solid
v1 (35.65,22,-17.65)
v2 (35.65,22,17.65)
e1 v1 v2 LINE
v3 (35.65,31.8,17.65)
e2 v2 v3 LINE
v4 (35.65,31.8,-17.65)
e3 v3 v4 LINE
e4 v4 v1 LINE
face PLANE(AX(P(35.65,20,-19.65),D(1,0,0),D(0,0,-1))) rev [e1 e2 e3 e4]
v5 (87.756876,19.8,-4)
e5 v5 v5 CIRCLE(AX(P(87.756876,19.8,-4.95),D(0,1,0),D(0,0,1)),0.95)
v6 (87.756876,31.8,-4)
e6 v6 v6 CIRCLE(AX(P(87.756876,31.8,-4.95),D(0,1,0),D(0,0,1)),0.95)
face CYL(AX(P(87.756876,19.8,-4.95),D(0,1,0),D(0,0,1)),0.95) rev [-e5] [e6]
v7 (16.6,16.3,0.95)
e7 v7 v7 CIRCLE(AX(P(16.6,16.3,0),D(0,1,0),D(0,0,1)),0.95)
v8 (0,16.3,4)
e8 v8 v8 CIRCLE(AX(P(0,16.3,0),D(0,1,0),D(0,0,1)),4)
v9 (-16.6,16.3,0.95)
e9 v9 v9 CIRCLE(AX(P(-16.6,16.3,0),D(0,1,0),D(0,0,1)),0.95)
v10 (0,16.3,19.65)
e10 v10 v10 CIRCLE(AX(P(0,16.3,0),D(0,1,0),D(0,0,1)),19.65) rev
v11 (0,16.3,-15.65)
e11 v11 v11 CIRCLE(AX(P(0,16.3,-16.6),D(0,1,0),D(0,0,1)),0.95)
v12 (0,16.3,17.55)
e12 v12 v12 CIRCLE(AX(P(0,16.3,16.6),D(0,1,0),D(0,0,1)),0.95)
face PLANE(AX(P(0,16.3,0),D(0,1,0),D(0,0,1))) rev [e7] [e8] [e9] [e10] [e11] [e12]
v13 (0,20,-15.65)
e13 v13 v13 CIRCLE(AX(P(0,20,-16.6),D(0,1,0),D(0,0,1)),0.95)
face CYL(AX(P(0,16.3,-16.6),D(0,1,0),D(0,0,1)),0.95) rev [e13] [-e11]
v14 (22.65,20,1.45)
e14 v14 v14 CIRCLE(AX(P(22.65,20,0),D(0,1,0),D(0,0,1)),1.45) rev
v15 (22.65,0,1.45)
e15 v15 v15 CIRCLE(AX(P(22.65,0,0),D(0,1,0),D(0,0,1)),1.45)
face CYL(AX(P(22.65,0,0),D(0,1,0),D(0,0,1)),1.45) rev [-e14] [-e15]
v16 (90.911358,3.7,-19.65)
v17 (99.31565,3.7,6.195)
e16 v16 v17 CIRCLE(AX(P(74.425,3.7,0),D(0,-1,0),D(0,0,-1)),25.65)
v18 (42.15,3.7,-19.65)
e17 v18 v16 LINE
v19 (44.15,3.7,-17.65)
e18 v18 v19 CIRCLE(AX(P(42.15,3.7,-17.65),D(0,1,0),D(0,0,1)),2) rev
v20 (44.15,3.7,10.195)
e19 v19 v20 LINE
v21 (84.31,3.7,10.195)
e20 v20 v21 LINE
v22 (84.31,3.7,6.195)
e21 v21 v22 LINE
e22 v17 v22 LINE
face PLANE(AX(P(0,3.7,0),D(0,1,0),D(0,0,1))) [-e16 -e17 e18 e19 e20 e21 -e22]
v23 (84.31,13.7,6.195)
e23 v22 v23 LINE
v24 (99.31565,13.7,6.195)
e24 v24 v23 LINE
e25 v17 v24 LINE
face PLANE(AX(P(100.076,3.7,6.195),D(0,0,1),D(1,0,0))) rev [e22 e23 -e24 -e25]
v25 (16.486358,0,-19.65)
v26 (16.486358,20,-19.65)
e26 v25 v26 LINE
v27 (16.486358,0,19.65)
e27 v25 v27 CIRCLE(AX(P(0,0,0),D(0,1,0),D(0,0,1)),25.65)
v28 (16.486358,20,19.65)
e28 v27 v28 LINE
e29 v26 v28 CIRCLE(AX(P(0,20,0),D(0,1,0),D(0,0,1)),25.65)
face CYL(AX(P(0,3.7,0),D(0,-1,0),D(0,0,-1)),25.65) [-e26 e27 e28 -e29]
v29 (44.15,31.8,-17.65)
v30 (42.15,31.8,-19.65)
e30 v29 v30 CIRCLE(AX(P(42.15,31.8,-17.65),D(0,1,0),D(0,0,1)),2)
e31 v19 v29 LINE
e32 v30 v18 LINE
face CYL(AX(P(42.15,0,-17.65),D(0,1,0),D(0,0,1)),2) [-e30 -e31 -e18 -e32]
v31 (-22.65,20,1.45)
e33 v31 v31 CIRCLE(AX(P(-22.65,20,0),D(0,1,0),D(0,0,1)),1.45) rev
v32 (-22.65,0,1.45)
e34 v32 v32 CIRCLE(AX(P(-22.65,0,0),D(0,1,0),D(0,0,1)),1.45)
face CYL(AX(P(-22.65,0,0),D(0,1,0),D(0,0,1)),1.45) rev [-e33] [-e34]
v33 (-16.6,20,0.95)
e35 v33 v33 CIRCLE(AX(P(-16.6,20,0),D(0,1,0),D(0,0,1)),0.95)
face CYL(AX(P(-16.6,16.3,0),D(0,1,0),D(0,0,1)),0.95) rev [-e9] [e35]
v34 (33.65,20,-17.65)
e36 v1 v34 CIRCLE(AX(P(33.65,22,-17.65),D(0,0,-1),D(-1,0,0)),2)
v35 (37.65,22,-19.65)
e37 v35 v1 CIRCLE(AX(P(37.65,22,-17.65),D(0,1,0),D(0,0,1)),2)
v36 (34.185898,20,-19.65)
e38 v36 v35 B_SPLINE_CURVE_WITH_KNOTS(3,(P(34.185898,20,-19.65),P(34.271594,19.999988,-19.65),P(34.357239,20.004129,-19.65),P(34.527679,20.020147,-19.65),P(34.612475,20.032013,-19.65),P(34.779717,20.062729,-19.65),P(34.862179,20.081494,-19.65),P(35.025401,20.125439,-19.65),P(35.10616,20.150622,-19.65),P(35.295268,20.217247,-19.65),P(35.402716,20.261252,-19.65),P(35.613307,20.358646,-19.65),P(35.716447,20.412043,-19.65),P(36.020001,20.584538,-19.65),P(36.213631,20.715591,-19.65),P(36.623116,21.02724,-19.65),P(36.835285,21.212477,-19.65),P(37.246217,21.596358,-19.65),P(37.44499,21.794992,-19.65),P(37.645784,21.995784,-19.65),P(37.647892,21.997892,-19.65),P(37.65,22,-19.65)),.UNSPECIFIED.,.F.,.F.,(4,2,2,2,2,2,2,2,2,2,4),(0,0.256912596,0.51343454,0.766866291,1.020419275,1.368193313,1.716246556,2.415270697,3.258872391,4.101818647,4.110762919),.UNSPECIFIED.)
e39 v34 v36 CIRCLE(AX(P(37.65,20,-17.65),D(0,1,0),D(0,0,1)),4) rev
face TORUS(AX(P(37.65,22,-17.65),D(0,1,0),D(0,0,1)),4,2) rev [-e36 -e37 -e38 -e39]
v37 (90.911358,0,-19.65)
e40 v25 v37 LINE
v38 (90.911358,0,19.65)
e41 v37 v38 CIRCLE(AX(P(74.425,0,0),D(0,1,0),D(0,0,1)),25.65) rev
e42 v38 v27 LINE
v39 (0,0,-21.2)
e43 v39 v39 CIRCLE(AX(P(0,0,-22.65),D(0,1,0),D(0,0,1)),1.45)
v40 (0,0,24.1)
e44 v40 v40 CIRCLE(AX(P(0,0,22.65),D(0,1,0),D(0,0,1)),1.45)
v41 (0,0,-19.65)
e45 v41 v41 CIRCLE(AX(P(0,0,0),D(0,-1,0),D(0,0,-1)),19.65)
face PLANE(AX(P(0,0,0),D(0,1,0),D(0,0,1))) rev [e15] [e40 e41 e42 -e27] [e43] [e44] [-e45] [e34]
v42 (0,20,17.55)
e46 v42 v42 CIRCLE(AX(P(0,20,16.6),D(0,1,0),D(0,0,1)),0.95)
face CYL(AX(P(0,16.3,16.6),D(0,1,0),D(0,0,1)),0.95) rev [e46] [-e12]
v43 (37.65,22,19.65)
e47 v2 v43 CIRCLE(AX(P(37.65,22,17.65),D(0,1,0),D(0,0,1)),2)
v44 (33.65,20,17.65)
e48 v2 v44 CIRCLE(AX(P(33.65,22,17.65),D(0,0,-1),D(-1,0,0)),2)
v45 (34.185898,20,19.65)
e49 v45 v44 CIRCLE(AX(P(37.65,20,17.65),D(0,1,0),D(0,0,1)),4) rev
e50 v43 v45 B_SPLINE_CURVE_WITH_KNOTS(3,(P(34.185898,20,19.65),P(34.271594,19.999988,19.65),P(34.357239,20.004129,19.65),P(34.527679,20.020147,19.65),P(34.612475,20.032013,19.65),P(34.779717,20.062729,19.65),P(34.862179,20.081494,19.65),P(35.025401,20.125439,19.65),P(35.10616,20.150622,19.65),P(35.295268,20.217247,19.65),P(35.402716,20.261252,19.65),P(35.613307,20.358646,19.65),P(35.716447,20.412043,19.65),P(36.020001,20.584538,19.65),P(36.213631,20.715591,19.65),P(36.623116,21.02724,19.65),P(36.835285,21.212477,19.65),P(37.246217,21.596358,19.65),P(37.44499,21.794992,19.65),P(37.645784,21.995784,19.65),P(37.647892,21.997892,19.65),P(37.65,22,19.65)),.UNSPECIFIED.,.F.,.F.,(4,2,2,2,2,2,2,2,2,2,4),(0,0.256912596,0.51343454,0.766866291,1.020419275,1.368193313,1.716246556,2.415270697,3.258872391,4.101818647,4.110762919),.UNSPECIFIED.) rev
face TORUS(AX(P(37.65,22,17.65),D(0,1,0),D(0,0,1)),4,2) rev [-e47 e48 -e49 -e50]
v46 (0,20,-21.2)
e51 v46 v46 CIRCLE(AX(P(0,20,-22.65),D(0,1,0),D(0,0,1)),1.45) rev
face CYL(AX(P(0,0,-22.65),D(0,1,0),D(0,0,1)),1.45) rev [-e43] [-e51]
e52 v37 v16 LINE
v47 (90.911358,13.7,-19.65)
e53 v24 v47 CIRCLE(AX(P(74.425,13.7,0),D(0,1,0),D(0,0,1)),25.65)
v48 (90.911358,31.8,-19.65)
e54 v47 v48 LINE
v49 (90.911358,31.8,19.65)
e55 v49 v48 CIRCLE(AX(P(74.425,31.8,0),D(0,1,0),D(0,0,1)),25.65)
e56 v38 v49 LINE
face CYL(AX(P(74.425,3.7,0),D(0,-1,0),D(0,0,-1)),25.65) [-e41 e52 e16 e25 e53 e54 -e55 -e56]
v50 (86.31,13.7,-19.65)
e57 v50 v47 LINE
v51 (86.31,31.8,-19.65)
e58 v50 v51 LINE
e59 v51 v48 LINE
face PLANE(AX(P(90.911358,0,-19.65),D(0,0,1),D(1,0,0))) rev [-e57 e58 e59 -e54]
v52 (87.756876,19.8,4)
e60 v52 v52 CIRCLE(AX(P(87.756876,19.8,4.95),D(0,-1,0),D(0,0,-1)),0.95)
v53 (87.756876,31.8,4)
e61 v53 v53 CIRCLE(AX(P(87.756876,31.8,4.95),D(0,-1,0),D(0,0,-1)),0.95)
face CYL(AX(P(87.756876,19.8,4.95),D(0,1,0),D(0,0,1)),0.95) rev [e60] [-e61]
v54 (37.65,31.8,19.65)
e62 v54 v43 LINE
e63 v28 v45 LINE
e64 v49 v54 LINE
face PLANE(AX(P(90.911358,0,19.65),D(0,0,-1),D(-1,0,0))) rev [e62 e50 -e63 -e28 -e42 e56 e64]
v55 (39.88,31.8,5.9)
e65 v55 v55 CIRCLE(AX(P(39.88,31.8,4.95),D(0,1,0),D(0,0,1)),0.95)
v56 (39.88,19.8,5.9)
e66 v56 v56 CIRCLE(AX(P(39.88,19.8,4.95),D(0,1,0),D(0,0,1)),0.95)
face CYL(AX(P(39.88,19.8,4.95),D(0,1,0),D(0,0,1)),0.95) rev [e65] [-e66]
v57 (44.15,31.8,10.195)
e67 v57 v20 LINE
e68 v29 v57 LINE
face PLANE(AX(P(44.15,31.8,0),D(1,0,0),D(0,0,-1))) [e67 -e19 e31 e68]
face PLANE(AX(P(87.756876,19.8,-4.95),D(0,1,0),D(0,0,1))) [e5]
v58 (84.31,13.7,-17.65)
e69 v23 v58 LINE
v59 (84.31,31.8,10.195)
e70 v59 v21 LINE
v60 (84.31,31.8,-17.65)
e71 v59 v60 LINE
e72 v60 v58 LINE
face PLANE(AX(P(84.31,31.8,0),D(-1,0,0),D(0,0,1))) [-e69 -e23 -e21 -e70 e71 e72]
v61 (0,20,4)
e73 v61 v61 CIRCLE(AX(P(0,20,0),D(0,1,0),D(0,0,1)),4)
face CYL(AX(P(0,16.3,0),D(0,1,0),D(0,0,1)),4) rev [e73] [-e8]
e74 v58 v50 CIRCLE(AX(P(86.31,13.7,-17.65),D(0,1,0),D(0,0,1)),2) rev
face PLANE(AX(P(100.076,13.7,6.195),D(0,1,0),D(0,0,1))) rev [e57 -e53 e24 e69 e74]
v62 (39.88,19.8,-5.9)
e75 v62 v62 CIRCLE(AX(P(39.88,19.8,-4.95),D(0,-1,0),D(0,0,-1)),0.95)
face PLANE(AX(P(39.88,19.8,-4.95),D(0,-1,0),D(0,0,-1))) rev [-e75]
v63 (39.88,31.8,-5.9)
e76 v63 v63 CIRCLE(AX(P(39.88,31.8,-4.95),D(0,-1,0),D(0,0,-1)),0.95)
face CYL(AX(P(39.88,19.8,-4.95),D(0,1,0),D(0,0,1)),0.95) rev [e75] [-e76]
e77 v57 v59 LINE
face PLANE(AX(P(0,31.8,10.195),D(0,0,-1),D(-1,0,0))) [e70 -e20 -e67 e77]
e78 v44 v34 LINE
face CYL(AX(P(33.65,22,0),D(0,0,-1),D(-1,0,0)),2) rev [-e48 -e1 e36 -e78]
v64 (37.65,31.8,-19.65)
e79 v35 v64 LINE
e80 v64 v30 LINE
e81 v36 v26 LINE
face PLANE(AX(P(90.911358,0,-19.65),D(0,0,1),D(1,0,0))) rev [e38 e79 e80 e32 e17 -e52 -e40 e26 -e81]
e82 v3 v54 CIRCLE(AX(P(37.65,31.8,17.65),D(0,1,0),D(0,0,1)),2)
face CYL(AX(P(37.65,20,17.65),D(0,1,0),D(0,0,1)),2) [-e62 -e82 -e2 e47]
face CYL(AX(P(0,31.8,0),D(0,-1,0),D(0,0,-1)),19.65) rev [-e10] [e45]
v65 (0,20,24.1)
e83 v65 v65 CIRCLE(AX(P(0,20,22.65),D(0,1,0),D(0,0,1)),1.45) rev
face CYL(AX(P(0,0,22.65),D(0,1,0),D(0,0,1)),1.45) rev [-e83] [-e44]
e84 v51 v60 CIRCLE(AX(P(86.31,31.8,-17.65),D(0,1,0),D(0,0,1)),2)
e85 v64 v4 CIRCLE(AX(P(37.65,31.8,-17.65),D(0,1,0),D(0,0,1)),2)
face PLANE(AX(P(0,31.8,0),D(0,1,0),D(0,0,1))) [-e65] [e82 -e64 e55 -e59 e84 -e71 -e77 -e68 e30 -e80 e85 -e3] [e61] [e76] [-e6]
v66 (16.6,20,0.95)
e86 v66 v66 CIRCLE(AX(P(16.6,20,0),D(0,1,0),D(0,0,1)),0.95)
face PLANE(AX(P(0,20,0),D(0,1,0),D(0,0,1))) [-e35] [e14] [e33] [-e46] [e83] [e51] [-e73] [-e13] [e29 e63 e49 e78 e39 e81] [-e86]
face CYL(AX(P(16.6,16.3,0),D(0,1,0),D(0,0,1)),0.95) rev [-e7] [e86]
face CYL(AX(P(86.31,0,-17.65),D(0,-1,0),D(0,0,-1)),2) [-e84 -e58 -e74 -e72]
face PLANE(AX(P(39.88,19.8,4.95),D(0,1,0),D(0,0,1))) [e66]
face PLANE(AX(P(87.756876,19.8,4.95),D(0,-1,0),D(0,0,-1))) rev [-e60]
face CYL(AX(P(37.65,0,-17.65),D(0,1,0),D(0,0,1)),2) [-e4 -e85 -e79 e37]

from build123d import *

# Parameters (mm, degrees)
SKETCH1_R                = 25.65
SKETCH1_R_2              = 19.65
SKETCH1_R_3              = 4
SKETCH1_R_4              = 0.95
SKETCH1_W                = 40.16
SKETCH1_H                = 20.39
BOSS_EXTRUDE2_DEPTH      = 3.7
SKETCH5_R                = 19.65
SKETCH5_W                = 40.16
SKETCH5_H                = 20.39
BOSS_EXTRUDE3_DEPTH      = 28.1
CUT_EXTRUDE1_REACH       = 112.955
SKETCH6_W                = 40.16
SKETCH6_H                = 28.1
CUT_EXTRUDE2_REACH       = 119.305
CUT_EXTRUDE2_END_RADIUS  = 25.65
SKETCH7_W                = 29.863740461
SKETCH7_H                = 10
CUT_EXTRUDE3_DEPTH       = 109.093330622
CUT_EXTRUDE3_DEPTH_BACK  = 109.093330622
SKETCH8_R                = 1.45
SKETCH9_R                = 0.95
CUT_EXTRUDE4_DEPTH       = 12
CUT_EXTRUDE5_DEPTH       = 109.093330622
FILLET1_R                = 2
CUT_EXTRUDE6_DEPTH       = 11.8
BOSS_EXTRUDE4_START      = -3.7
SKETCH14_R               = 19.65
SKETCH14_R_2             = 0.95
SKETCH14_R_3             = 4
BOSS_EXTRUDE4_DEPTH      = 3.7
CUT_EXTRUDE7_START       = -3.7
CUT_EXTRUDE7_OUTLINE_R   = 19.65
CUT_EXTRUDE7_OUTLINE_R_2 = 0.95
CUT_EXTRUDE7_OUTLINE_R_3 = 4
CUT_EXTRUDE7_DEPTH       = 3.7
FILLET2_R                = 2
FILLET3_R                = 2


# Read off the part's stored shape, not the designer's step: Cut-Extrude7
with BuildPart() as part:
    # Sketch1 → Boss-Extrude2 (new body)
    # profile 1 of 6: a face of its own
    with BuildSketch(Plane(origin=(0, 0, 0), x_dir=(1, 0, 0), z_dir=(0, 1, 0))):
        Circle(SKETCH1_R)
        Circle(SKETCH1_R_2, mode=Mode.SUBTRACT)
    # profile 2 of 6: a face of its own
    with BuildSketch(Plane(origin=(0, 0, 0), x_dir=(1, 0, 0), z_dir=(0, 1, 0))):
        Circle(SKETCH1_R_2)
        with Locations(Location((0, 0, 0), (0, 0, 270))):
            Circle(SKETCH1_R_3, mode=Mode.SUBTRACT)
        with Locations(Location((16.6, 0, 0), (0, 0, 270))):
            Circle(SKETCH1_R_4, mode=Mode.SUBTRACT)
        with Locations(Location((0, -16.6, 0), (0, 0, 270))):
            Circle(SKETCH1_R_4, mode=Mode.SUBTRACT)
        with Locations(Location((-16.6, 0, 0), (0, 0, 270))):
            Circle(SKETCH1_R_4, mode=Mode.SUBTRACT)
        with Locations(Location((0, 16.6, 0), (0, 0, 270))):
            Circle(SKETCH1_R_4, mode=Mode.SUBTRACT)
    # profile 3 of 6: a face of its own
    with BuildSketch(Plane(origin=(0, 0, 0), x_dir=(1, 0, 0), z_dir=(0, 1, 0))):
        with BuildLine():
            Line((35.65, 18.695), (91.986875612, 18.695))
            ThreePointArc((91.986875612, 18.695), (83.869462663, 23.847948025), (74.425, 25.65))
            Line((74.425, 25.65), (0, 25.65))
            ThreePointArc((0, 25.65), (18.137288937, 18.137288937), (25.65, 0))
            ThreePointArc((25.65, 0), (18.137288937, -18.137288937), (0, -25.65))
            Line((0, -25.65), (74.425, -25.65))
            ThreePointArc((74.425, -25.65), (83.869462663, -23.847948025), (91.986875612, -18.695))
            Line((91.986875612, -18.695), (35.65, -18.695))
            Line((35.65, -18.695), (35.65, 18.695))
        make_face()
    # profile 4 of 6: a face of its own
    with BuildSketch(Plane(origin=(0, 0, 0), x_dir=(1, 0, 0), z_dir=(0, 1, 0))):
        with BuildLine():
            Line((92.81, -17.886147573), (92.81, 17.886147573))
            ThreePointArc((92.81, 17.886147573), (92.402987293, 18.295203548), (91.986875612, 18.695))
            Line((91.986875612, 18.695), (35.65, 18.695))
            Line((35.65, 18.695), (35.65, -18.695))
            Line((35.65, -18.695), (91.986875612, -18.695))
            ThreePointArc((91.986875612, -18.695), (92.402987293, -18.295203548), (92.81, -17.886147573))
        make_face()
        with Locations((64.23, 0)):
            Rectangle(SKETCH1_W, SKETCH1_H, mode=Mode.SUBTRACT)
    # profile 5 of 6: a face of its own
    with BuildSketch(Plane(origin=(0, 0, 0), x_dir=(1, 0, 0), z_dir=(0, 1, 0))):
        with Locations((64.23, 0)):
            Rectangle(SKETCH1_W, SKETCH1_H)
    # profile 6 of 6: a face of its own
    with BuildSketch(Plane(origin=(0, 0, 0), x_dir=(1, 0, 0), z_dir=(0, 1, 0))):
        with BuildLine():
            ThreePointArc((92.81, -17.886147573), (100.075, 0), (92.81, 17.886147573))
            Line((92.81, 17.886147573), (92.81, -17.886147573))
        make_face()
    extrude(amount=BOSS_EXTRUDE2_DEPTH)

    # Sketch5 → Boss-Extrude3 (add)
    # profile 1 of 4: a face of its own
    with BuildSketch(Plane(origin=(0, 3.7, 0), x_dir=(1, 0, 0), z_dir=(0, 1, 0))):
        with BuildLine():
            ThreePointArc((25.65, 0), (18.137288937, 18.137288937), (0, 25.65))
            ThreePointArc((0, 25.65), (-25.65, 0), (0, -25.65))
            ThreePointArc((0, -25.65), (18.137288937, -18.137288937), (25.65, 0))
        make_face()
        with Locations(Location((0, 0, 0), (0, 0, 270))):
            Circle(SKETCH5_R, mode=Mode.SUBTRACT)
    # profile 2 of 4: a face of its own
    with BuildSketch(Plane(origin=(0, 3.7, 0), x_dir=(1, 0, 0), z_dir=(0, 1, 0))):
        with BuildLine():
            ThreePointArc((92.81, 17.886147573), (92.402987293, 18.295203548), (91.986875612, 18.695))
            Line((91.986875612, 18.695), (35.65, 18.695))
            Line((35.65, 18.695), (35.65, -18.695))
            Line((35.65, -18.695), (91.986875612, -18.695))
            ThreePointArc((91.986875612, -18.695), (92.402987293, -18.295203548), (92.81, -17.886147573))
            Line((92.81, -17.886147573), (92.81, 17.886147573))
        make_face()
        with Locations((64.23, 0)):
            Rectangle(SKETCH5_W, SKETCH5_H, mode=Mode.SUBTRACT)
    # profile 3 of 4: a face of its own
    with BuildSketch(Plane(origin=(0, 3.7, 0), x_dir=(1, 0, 0), z_dir=(0, 1, 0))):
        with BuildLine():
            ThreePointArc((91.986875612, 18.695), (83.869462663, 23.847948025), (74.425, 25.65))
            Line((74.425, 25.65), (0, 25.65))
            ThreePointArc((0, 25.65), (18.137288937, 18.137288937), (25.65, 0))
            ThreePointArc((25.65, 0), (18.137288937, -18.137288937), (0, -25.65))
            Line((0, -25.65), (74.425, -25.65))
            ThreePointArc((74.425, -25.65), (83.869462663, -23.847948025), (91.986875612, -18.695))
            Line((91.986875612, -18.695), (35.65, -18.695))
            Line((35.65, -18.695), (35.65, 18.695))
            Line((35.65, 18.695), (91.986875612, 18.695))
        make_face()
    # profile 4 of 4: a face of its own
    with BuildSketch(Plane(origin=(0, 3.7, 0), x_dir=(1, 0, 0), z_dir=(0, 1, 0))):
        with BuildLine():
            ThreePointArc((92.81, -17.886147573), (100.075, 0), (92.81, 17.886147573))
            Line((92.81, 17.886147573), (92.81, -17.886147573))
        make_face()
    extrude(amount=BOSS_EXTRUDE3_DEPTH)

    # Sketch6 → Cut-Extrude1 (cut, up to next)
    with BuildSketch(Plane.XY.offset(-10.195), mode=Mode.PRIVATE) as cut_extrude1_sk1:
        with Locations((64.23, 17.75)):
            Rectangle(SKETCH6_W, SKETCH6_H)
    cut_extrude1_tool1 = extrude(cut_extrude1_sk1.sketch, amount=-CUT_EXTRUDE1_REACH, mode=Mode.PRIVATE) & part.part
    add(cut_extrude1_tool1.solids().sort_by_distance((64.23, 17.75, -10.195))[0], mode=Mode.SUBTRACT)

    # Cut-Extrude2: up to this cylinder (the profile starts inside it)
    cut_extrude2_end = Plane(origin=(74.425, 8.7, 0), z_dir=(0, -1, 0)) * Cylinder(CUT_EXTRUDE2_END_RADIUS, 290.91, mode=Mode.PRIVATE)
    # Sketch7 → Cut-Extrude2 (cut, up to the surface)
    with BuildSketch(Plane.ZY.offset(-84.31), mode=Mode.PRIVATE) as cut_extrude2_sk1:
        with Locations((-8.736870231, 8.7)):
            Rectangle(SKETCH7_W, SKETCH7_H)
    cut_extrude2_tool1 = extrude(cut_extrude2_sk1.sketch, amount=-CUT_EXTRUDE2_REACH, mode=Mode.PRIVATE) & cut_extrude2_end
    add(cut_extrude2_tool1.solids().sort_by_distance((84.31, 8.7, -8.73687))[0], mode=Mode.SUBTRACT)

    # Sketch8 → Cut-Extrude3 (cut, two sides: drawn at the far end of the back side and taken through both)
    with BuildSketch(Plane(origin=(0, 31.8, 0), x_dir=(1, 0, 0), z_dir=(0, 1, 0)).offset(-CUT_EXTRUDE3_DEPTH_BACK)):
        with Locations(Location((22.65, 0, 0), (0, 0, 270))):
            Circle(SKETCH8_R)
        with Locations(Location((0, -22.65, 0), (0, 0, 270))):
            Circle(SKETCH8_R)
        with Locations(Location((-22.65, 0, 0), (0, 0, 270))):
            Circle(SKETCH8_R)
        with Locations(Location((0, 22.65, 0), (0, 0, 270))):
            Circle(SKETCH8_R)
    extrude(amount=CUT_EXTRUDE3_DEPTH + CUT_EXTRUDE3_DEPTH_BACK, mode=Mode.SUBTRACT)

    # Sketch9 → Cut-Extrude4 (cut)
    with BuildSketch(Plane(origin=(0, 31.8, 0), x_dir=(1, 0, 0), z_dir=(0, 1, 0))):
        with Locations(Location((39.88, -4.95, 0), (0, 0, 270))):
            Circle(SKETCH9_R)
        with Locations(Location((39.88, 4.95, 0), (0, 0, 90))):
            Circle(SKETCH9_R)
        with Locations(Location((87.756875612, -4.95, 0), (0, 0, 90))):
            Circle(SKETCH9_R)
        with Locations(Location((87.756875612, 4.95, 0), (0, 0, 270))):
            Circle(SKETCH9_R)
    extrude(amount=-CUT_EXTRUDE4_DEPTH, mode=Mode.SUBTRACT)

    # Sketch12 → Cut-Extrude5 (cut, through all)
    with BuildSketch(Plane(origin=(0, 31.8, 0), x_dir=(1, 0, 0), z_dir=(0, 1, 0))):
        with BuildLine():
            Line((0, 25.65), (74.425, 25.65))
            ThreePointArc((74.425, 25.65), (83.19711491, 24.103371134), (90.911357997, 19.65))
            Line((90.911357997, 19.65), (16.486357997, 19.65))
            ThreePointArc((16.486357997, 19.65), (8.77211491, 24.103371134), (0, 25.65))
        make_face()
        with BuildLine():
            Line((0, -25.65), (74.425, -25.65))
            ThreePointArc((74.425, -25.65), (83.19711491, -24.103371134), (90.911357997, -19.65))
            Line((90.911357997, -19.65), (16.486357997, -19.65))
            ThreePointArc((16.486357997, -19.65), (8.77211491, -24.103371134), (0, -25.65))
        make_face()
    extrude(amount=-CUT_EXTRUDE5_DEPTH, mode=Mode.SUBTRACT)

    # Fillet1
    fillet1_edges = [part.edges().sort_by_distance(p)[0] for p in [
        (44.15, 17.75, -19.65),
        (84.31, 22.75, -19.65),
    ]]
    fillet(fillet1_edges, radius=FILLET1_R)

    # Sketch13 → Cut-Extrude6 (cut)
    with BuildSketch(Plane(origin=(0, 31.8, 0), x_dir=(1, 0, 0), z_dir=(0, 1, 0))):
        with BuildLine():
            Line((35.65, 19.65), (35.65, -19.65))
            Line((35.65, -19.65), (16.486357997, -19.65))
            ThreePointArc((16.486357997, -19.65), (-25.65, 0), (16.486357997, 19.65))
            Line((16.486357997, 19.65), (35.65, 19.65))
        make_face()
    extrude(amount=-CUT_EXTRUDE6_DEPTH, mode=Mode.SUBTRACT)

    # Sketch14 → Boss-Extrude4 (add)
    with BuildSketch(Plane(origin=(0, 20, 0), x_dir=(1, 0, 0), z_dir=(0, 1, 0)).offset(BOSS_EXTRUDE4_START)):
        with Locations(Location((0, 0, 0), (0, 0, 270))):
            Circle(SKETCH14_R)
        with Locations(Location((16.6, 0, 0), (0, 0, 270))):
            Circle(SKETCH14_R_2, mode=Mode.SUBTRACT)
        with Locations(Location((0, -16.6, 0), (0, 0, 270))):
            Circle(SKETCH14_R_2, mode=Mode.SUBTRACT)
        with Locations(Location((-16.6, 0, 0), (0, 0, 270))):
            Circle(SKETCH14_R_2, mode=Mode.SUBTRACT)
        with Locations(Location((0, 16.6, 0), (0, 0, 270))):
            Circle(SKETCH14_R_2, mode=Mode.SUBTRACT)
        with Locations(Location((0, 0, 0), (0, 0, 270))):
            Circle(SKETCH14_R_3, mode=Mode.SUBTRACT)
    extrude(amount=BOSS_EXTRUDE4_DEPTH)

    # Cut-Extrude7 outline → Cut-Extrude7 (cut)
    with BuildSketch(Plane.XZ.offset(CUT_EXTRUDE7_START)):
        Circle(CUT_EXTRUDE7_OUTLINE_R)
        with Locations((0, -16.6)):
            Circle(CUT_EXTRUDE7_OUTLINE_R_2, mode=Mode.SUBTRACT)
        with Locations((-16.6, 0)):
            Circle(CUT_EXTRUDE7_OUTLINE_R_2, mode=Mode.SUBTRACT)
        Circle(CUT_EXTRUDE7_OUTLINE_R_3, mode=Mode.SUBTRACT)
        with Locations((16.6, 0)):
            Circle(CUT_EXTRUDE7_OUTLINE_R_2, mode=Mode.SUBTRACT)
        with Locations((0, 16.6)):
            Circle(CUT_EXTRUDE7_OUTLINE_R_2, mode=Mode.SUBTRACT)
    extrude(amount=CUT_EXTRUDE7_DEPTH, mode=Mode.SUBTRACT)

    # Fillet2
    fillet2_edges = [part.edges().sort_by_distance(p)[0] for p in [
        (35.65, 25.9, -19.65),
        (35.65, 25.9, 19.65),
    ]]
    fillet(fillet2_edges, radius=FILLET2_R)

    # Fillet3
    fillet3_edges = [part.edges().sort_by_distance(p)[0] for p in [
        (35.65, 20, 0),
        (36.235786438, 20, -19.064213562),
        (36.235786438, 20, 19.064213562),
    ]]
    fillet(fillet3_edges, radius=FILLET3_R)


solid = part.part
